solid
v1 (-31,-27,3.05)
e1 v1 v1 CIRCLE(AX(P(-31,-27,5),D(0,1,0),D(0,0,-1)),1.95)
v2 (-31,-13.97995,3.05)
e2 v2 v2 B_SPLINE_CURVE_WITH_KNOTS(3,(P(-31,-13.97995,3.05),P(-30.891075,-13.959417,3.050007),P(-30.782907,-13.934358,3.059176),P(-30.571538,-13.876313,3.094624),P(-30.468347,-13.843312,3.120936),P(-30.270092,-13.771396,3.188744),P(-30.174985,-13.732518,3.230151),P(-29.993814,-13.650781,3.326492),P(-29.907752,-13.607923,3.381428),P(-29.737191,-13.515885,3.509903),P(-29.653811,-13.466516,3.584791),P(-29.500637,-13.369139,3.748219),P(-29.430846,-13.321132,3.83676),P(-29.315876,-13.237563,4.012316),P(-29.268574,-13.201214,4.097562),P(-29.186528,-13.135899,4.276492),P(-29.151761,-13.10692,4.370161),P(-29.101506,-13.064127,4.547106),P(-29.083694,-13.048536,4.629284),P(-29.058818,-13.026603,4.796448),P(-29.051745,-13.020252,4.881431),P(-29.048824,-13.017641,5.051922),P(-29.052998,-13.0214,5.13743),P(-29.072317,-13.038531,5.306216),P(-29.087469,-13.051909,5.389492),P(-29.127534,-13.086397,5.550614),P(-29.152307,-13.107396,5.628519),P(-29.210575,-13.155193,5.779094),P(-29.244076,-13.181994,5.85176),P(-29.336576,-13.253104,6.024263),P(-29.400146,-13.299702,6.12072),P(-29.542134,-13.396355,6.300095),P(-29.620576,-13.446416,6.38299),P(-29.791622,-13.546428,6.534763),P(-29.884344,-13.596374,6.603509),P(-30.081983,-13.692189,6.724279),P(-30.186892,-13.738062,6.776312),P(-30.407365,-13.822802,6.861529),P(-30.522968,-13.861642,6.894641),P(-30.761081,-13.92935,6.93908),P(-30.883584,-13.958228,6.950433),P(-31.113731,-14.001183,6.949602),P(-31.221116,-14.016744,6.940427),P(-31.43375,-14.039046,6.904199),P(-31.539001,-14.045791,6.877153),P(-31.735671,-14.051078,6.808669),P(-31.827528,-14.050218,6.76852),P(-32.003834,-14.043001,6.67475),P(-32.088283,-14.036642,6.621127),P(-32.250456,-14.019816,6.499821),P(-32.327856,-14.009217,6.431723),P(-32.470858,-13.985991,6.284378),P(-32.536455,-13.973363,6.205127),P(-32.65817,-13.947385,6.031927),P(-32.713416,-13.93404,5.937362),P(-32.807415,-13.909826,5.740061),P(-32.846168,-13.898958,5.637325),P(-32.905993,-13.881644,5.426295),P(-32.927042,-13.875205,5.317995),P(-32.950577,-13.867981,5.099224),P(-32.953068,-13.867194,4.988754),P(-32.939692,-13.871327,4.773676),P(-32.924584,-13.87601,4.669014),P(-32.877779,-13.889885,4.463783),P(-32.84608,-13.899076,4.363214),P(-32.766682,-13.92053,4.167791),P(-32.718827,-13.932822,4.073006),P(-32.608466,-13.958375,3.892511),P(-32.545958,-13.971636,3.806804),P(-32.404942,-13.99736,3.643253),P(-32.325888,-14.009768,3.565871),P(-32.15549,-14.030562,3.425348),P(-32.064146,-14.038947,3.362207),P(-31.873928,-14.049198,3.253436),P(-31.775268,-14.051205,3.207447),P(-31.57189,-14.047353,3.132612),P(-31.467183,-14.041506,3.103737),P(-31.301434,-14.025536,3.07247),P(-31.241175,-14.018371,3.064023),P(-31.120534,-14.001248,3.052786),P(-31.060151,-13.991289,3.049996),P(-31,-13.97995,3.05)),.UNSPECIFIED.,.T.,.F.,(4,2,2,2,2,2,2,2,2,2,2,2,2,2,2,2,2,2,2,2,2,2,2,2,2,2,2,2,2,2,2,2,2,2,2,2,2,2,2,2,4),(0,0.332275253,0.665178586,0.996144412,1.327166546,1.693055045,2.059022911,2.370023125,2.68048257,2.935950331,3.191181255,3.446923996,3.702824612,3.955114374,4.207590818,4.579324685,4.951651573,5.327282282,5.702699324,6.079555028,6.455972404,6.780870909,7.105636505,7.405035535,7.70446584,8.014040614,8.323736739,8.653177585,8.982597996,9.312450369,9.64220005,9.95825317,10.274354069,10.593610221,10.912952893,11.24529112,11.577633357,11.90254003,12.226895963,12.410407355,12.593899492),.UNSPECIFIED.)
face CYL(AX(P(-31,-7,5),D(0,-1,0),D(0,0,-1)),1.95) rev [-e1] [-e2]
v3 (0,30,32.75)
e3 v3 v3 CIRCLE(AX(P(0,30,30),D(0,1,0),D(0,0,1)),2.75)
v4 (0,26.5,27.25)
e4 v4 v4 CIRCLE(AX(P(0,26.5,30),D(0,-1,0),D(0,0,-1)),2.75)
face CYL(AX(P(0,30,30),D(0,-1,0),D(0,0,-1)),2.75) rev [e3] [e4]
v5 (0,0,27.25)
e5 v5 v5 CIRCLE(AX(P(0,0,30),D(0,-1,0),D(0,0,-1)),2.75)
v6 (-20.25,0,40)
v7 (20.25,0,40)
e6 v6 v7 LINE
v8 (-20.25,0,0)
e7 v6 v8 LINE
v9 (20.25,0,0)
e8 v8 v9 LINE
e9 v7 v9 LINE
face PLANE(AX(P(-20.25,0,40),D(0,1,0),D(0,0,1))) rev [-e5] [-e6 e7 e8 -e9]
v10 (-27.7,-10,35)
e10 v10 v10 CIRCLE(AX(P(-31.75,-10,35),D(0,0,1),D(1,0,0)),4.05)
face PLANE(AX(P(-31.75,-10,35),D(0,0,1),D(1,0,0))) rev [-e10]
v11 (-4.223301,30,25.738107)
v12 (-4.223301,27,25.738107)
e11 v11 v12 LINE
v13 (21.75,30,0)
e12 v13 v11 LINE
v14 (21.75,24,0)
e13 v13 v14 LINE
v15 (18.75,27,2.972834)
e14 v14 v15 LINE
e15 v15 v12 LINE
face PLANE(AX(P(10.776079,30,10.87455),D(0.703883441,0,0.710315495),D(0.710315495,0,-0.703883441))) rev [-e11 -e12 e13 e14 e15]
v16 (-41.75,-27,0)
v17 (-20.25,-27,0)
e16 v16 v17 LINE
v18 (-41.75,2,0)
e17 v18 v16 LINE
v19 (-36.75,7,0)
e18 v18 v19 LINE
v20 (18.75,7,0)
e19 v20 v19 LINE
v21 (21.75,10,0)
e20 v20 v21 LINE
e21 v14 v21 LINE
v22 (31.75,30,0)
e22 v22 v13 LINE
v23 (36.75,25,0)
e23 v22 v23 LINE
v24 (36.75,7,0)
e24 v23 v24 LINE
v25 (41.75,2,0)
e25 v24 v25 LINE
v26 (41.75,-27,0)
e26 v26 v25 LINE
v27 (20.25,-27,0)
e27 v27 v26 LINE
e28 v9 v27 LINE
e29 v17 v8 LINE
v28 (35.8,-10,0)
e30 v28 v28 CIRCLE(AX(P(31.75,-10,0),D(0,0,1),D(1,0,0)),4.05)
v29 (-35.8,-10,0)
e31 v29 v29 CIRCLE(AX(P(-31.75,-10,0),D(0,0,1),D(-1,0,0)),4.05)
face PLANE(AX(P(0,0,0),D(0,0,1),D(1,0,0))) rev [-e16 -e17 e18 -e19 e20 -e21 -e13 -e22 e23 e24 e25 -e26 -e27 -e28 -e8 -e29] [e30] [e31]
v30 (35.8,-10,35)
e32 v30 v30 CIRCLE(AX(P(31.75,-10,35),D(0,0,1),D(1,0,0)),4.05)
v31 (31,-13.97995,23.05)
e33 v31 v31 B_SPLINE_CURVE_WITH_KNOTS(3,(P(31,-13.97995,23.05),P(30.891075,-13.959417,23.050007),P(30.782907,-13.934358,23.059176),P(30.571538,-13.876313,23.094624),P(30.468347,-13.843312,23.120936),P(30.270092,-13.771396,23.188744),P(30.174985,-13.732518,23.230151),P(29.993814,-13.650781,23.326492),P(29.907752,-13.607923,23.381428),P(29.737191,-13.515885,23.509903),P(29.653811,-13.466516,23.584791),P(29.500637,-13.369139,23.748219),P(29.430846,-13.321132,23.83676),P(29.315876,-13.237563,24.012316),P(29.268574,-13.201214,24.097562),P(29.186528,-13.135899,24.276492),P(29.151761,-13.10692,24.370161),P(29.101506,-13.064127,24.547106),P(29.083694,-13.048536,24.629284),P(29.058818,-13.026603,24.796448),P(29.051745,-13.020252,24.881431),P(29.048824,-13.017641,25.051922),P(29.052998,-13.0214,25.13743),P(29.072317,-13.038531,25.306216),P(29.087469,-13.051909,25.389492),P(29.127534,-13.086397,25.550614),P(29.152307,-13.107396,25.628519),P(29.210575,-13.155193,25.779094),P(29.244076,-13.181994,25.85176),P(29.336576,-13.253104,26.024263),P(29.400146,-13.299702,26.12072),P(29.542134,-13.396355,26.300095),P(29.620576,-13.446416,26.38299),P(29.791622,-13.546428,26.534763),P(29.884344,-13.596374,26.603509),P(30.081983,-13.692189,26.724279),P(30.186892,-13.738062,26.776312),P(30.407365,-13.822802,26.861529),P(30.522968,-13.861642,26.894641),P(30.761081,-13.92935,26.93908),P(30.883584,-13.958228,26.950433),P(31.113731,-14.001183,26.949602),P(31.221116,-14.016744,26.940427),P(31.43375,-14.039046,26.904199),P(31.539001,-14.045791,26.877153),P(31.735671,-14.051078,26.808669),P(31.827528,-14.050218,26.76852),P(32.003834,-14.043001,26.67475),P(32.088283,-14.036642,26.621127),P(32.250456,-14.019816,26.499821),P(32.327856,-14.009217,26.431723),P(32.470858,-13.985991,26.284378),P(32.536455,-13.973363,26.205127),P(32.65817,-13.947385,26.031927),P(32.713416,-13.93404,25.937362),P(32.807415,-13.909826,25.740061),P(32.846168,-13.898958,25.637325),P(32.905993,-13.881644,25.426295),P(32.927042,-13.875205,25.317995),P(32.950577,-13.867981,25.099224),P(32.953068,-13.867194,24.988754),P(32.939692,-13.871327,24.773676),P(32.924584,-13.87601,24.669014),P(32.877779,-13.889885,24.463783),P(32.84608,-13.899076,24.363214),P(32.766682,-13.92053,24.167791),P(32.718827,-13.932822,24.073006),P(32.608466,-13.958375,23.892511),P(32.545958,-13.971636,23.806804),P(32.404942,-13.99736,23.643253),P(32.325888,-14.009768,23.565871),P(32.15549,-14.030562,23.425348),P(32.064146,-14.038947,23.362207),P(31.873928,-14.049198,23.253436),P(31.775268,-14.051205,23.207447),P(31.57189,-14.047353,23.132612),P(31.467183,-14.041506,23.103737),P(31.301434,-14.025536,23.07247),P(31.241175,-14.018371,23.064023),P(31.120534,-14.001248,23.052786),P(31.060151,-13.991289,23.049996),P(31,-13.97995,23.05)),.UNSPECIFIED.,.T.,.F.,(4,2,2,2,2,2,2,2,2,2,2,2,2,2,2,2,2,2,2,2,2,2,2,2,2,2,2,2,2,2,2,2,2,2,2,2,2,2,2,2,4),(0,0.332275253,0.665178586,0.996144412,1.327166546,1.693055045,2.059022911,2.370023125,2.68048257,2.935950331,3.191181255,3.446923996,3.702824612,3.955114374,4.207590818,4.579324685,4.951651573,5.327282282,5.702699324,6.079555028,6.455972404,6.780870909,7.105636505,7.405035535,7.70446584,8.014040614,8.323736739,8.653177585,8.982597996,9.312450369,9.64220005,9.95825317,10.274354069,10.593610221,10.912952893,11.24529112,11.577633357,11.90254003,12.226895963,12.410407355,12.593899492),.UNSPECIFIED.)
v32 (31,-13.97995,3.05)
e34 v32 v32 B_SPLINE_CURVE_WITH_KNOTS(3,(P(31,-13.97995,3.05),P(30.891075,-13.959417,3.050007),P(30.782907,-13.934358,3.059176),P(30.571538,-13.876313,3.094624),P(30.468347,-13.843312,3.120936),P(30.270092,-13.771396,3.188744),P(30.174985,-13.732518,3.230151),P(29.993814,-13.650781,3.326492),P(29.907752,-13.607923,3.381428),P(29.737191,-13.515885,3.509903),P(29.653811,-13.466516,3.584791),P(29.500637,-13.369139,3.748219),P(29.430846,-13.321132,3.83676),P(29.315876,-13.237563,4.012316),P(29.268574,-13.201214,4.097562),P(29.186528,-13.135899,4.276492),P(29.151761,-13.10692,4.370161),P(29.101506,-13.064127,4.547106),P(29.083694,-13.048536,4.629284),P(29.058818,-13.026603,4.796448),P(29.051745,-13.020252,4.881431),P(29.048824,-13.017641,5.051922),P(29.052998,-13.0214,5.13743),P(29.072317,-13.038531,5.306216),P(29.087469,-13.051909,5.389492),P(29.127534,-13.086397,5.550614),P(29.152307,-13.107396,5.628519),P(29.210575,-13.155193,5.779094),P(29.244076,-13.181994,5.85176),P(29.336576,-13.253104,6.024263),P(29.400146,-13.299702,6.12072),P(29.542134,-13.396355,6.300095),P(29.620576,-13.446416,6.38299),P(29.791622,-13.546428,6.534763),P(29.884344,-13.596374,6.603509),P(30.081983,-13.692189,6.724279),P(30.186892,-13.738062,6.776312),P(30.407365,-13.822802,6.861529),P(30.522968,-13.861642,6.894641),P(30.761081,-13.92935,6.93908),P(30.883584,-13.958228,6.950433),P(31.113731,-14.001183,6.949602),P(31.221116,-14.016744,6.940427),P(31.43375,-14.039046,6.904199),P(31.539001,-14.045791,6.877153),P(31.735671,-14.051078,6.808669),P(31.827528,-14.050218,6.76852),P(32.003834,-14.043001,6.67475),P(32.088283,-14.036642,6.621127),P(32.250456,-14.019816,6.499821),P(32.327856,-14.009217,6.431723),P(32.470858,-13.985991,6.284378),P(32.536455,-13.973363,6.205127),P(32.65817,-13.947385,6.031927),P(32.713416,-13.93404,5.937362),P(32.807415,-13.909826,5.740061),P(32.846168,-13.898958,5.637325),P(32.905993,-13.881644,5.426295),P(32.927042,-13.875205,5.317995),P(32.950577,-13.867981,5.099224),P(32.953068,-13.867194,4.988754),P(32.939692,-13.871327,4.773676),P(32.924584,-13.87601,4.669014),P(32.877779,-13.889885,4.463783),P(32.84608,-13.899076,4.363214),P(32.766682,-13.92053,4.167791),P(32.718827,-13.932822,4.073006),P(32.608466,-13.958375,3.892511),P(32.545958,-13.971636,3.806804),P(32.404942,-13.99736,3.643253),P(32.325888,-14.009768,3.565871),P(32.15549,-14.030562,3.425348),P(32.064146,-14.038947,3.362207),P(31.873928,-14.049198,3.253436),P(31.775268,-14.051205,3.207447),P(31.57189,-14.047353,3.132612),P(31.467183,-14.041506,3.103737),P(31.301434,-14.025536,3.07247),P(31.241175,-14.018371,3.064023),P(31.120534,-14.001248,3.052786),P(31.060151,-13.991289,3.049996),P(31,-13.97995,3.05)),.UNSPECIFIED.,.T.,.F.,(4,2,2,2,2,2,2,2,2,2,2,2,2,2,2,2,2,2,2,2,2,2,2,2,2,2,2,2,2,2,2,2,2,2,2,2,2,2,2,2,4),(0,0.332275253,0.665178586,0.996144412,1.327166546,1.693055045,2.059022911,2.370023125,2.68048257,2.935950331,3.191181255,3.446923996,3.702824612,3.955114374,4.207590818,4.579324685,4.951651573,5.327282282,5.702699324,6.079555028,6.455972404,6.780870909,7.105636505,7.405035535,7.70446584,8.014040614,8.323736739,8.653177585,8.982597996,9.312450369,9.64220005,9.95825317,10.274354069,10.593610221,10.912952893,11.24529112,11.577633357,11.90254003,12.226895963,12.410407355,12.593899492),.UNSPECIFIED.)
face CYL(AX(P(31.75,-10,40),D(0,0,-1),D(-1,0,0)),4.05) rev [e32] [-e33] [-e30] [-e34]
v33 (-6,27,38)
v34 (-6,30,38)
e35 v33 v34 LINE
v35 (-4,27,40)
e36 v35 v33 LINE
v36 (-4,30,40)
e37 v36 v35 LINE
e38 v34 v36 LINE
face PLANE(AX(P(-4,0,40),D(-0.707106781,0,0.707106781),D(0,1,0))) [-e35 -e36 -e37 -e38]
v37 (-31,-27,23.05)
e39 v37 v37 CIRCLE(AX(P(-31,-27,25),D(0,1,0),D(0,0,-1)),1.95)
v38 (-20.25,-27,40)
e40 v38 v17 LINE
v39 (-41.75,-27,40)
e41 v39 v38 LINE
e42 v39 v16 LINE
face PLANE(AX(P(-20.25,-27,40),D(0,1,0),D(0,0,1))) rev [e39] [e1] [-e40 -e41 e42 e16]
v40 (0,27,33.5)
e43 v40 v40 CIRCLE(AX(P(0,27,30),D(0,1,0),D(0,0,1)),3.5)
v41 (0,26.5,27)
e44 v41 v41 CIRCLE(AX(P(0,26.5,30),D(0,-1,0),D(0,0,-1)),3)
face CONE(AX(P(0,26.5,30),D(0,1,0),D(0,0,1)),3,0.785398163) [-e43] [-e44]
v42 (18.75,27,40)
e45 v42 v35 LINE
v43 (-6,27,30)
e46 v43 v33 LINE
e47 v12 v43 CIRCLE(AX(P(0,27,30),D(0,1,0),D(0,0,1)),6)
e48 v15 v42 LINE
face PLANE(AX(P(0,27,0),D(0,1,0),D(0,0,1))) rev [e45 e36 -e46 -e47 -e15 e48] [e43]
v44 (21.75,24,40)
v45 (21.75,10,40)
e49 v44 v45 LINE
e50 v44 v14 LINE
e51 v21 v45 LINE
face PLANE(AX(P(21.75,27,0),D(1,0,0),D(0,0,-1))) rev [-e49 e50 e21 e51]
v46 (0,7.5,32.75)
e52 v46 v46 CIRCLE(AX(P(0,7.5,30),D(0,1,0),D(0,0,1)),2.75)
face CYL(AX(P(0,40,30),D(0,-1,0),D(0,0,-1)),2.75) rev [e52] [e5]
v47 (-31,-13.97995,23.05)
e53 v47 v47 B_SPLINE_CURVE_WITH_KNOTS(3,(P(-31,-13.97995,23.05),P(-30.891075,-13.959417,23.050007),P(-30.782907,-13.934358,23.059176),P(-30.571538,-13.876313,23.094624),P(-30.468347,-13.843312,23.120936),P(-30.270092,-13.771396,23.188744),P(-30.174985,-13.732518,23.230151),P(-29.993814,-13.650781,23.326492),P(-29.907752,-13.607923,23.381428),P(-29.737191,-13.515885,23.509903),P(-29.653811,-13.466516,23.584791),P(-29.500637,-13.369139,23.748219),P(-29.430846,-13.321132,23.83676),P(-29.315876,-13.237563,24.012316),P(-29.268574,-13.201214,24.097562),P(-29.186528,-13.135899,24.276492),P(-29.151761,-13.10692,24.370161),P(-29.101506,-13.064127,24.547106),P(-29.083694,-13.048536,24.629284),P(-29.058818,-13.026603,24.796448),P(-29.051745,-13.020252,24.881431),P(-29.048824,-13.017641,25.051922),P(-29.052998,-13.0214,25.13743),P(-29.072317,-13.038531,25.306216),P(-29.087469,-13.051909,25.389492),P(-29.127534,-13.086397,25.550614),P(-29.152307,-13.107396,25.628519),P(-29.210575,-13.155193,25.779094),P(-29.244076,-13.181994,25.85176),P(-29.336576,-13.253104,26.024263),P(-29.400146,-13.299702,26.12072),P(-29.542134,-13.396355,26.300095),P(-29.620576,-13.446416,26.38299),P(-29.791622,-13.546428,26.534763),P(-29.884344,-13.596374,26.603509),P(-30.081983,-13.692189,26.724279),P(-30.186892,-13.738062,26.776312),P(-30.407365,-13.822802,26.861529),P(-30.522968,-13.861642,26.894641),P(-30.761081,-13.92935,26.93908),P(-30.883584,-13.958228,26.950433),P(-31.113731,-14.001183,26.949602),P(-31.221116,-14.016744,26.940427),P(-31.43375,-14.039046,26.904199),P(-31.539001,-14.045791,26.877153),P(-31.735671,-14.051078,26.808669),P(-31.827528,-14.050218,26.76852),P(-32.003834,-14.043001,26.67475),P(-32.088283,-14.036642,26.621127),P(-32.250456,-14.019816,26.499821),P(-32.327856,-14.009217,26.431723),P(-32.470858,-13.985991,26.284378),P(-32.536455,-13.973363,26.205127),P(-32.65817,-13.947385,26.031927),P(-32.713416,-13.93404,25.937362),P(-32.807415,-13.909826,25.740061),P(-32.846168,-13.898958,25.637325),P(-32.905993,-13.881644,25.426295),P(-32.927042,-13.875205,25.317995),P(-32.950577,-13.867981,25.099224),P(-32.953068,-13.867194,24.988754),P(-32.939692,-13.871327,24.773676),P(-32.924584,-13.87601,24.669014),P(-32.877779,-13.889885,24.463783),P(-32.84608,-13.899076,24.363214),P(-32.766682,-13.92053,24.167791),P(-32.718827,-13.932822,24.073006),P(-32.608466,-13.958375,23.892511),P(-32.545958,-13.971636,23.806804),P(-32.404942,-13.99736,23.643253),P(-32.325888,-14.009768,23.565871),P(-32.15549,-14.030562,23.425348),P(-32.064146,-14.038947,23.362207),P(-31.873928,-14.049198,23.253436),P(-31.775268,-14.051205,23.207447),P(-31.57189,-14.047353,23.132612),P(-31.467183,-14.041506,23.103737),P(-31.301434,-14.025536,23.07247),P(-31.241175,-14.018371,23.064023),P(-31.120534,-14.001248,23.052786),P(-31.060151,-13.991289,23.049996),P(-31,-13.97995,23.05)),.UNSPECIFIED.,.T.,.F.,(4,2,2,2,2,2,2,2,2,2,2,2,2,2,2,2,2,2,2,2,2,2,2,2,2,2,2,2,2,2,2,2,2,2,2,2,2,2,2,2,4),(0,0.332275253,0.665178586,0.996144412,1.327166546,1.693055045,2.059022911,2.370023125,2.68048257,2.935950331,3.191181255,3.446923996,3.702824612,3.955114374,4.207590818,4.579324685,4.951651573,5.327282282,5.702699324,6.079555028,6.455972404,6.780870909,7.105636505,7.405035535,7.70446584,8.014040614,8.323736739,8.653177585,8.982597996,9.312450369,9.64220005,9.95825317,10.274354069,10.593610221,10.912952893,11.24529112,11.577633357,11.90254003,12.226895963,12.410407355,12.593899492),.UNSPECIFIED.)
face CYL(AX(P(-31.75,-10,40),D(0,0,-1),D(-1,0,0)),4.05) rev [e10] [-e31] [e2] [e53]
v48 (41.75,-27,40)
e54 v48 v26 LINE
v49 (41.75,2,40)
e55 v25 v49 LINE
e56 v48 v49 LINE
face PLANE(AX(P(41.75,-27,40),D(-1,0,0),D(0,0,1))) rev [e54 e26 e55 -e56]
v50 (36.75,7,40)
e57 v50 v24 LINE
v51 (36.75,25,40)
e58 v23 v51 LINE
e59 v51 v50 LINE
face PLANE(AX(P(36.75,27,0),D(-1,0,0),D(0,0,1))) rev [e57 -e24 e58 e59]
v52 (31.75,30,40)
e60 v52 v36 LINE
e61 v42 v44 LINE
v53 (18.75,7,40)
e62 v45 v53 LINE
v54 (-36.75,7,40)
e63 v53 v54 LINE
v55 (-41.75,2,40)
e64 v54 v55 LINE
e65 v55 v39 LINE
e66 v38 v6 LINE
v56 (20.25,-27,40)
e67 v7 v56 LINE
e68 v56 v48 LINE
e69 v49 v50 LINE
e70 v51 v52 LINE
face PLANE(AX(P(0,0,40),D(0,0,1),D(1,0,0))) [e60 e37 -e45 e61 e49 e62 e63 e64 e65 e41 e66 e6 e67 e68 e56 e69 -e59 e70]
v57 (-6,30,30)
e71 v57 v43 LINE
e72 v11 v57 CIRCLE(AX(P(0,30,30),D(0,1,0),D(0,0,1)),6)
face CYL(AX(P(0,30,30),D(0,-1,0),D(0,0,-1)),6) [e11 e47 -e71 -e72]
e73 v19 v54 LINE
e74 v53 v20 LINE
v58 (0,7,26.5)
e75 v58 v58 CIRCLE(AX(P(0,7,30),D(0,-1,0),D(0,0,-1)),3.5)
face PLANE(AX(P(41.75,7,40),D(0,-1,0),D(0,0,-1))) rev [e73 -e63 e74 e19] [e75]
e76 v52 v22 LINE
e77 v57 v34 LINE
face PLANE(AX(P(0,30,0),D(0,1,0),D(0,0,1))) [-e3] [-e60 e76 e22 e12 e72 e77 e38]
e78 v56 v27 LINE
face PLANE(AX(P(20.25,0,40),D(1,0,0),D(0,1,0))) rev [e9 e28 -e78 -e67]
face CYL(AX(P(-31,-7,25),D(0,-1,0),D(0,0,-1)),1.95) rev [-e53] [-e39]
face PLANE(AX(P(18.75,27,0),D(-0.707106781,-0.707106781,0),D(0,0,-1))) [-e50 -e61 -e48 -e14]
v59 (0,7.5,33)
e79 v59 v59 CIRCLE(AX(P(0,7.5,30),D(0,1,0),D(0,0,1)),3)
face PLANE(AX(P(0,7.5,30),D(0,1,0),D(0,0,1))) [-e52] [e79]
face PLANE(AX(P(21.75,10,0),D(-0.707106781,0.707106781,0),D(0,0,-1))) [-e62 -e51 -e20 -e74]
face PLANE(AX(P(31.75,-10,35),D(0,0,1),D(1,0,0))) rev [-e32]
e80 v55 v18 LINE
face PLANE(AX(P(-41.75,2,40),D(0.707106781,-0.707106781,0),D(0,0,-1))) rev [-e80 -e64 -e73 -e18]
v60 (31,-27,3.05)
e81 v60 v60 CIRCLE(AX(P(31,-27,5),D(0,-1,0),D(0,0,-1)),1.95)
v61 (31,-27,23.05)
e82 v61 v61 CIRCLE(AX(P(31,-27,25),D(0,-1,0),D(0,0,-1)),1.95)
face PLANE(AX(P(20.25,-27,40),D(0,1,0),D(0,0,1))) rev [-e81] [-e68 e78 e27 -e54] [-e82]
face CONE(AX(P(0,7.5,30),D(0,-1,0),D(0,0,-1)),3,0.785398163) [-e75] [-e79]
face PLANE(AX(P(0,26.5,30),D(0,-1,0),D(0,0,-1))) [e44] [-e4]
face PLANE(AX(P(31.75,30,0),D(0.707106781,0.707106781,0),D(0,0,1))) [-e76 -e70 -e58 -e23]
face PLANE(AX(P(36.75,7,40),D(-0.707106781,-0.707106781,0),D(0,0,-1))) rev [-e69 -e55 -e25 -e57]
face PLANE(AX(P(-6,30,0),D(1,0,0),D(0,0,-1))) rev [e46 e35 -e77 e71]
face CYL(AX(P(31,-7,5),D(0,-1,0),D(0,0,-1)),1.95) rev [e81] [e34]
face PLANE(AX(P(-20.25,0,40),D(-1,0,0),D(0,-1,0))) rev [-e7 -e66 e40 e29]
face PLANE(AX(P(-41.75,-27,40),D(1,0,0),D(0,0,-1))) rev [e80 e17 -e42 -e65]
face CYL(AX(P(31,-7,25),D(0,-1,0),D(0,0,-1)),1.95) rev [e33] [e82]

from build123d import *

# Parameters (mm, degrees)
SKETCH1_R           = 4.05
BOSS_EXTRUDE1_DEPTH = 40
SKETCH2_R           = 2.75
CUT_EXTRUDE1_DEPTH  = 40
CHAMFER1_SIZE       = 5
SKETCH4_W           = 15
SKETCH4_H           = 40
BOSS_EXTRUDE2_DEPTH = 20
SKETCH5_R           = 2.75
BOSS_EXTRUDE3_DEPTH = 3
CHAMFER2_SIZE       = 5
CHAMFER3_SIZE       = 5
BOSS_EXTRUDE4_START = -5
SKETCH6_R           = 4.05
BOSS_EXTRUDE4_DEPTH = 5
SKETCH7_R           = 1.95
CUT_EXTRUDE2_DEPTH  = 20
CHAMFER4_SIZE       = 2
CHAMFER5_SIZE       = 3
SKETCH8_R           = 3
SKETCH8_R_2         = 2.75
BOSS_EXTRUDE5_DEPTH = 0.5
CHAMFER6_SIZE       = 0.5
BOSS_EXTRUDE6_START = 0.5
SKETCH9_R           = 3
SKETCH9_R_2         = 2.75
BOSS_EXTRUDE6_DEPTH = 0.5
CHAMFER7_SIZE       = 0.5


with BuildPart() as part:
    # Sketch1 → Boss-Extrude1 (new body)
    with BuildSketch(Plane.XY):
        Polygon((-20.25, 0), (20.25, 0), (20.25, -27), (41.75, -27), (41.75, 7), (-41.75, 7), (-41.75, -27), (-20.25, -27), align=None)
        with Locations((31.75, -10)):
            Circle(SKETCH1_R, mode=Mode.SUBTRACT)
        with Locations(Location((-31.75, -10, 0), (0, 0, 180))):
            Circle(SKETCH1_R, mode=Mode.SUBTRACT)
    extrude(amount=BOSS_EXTRUDE1_DEPTH)

    # Sketch2 → Cut-Extrude1 (cut)
    with BuildSketch(Plane(origin=(0, 0, 0), x_dir=(-1, 0, 0), z_dir=(0, -1, 0))):
        with Locations(Location((0, -30, 0), (0, 0, 90))):
            Circle(SKETCH2_R)
    extrude(amount=-CUT_EXTRUDE1_DEPTH, mode=Mode.SUBTRACT)

    # Chamfer1
    chamfer1_edges = [part.edges().sort_by_distance(p)[0] for p in [
        (41.75, 7, 20),
    ]]
    chamfer(chamfer1_edges, length=CHAMFER1_SIZE)

    # Sketch4 → Boss-Extrude2 (add)
    with BuildSketch(Plane(origin=(0, 7, 0), x_dir=(1, 0, 0), z_dir=(0, 1, 0))):
        with Locations((29.25, -20)):
            Rectangle(SKETCH4_W, SKETCH4_H)
    extrude(amount=BOSS_EXTRUDE2_DEPTH)

    # Sketch5 → Boss-Extrude3 (add)
    with BuildSketch(Plane(origin=(0, 27, 0), x_dir=(1, 0, 0), z_dir=(0, 1, 0))):
        with BuildLine():
            Line((20.579588566, -40), (21.75, -40))
            Line((21.75, -40), (36.75, -40))
            Line((36.75, -40), (36.75, 0))
            Line((36.75, 0), (21.75, 0))
            Line((21.75, 0), (-4.223300645, -25.738107033))
            ThreePointArc((-4.223300645, -25.738107033), (-5.538041345, -27.691299485), (-6, -30))
            Line((-6, -30), (-6, -40))
            Line((-6, -40), (20.579588566, -40))
        make_face()
        with Locations(Location((0, -30, 0), (0, 0, 90))):
            Circle(SKETCH5_R, mode=Mode.SUBTRACT)
    extrude(amount=BOSS_EXTRUDE3_DEPTH)

    # Chamfer2
    chamfer2_edges = [part.edges().sort_by_distance(p)[0] for p in [
        (36.75, 30, 20),
    ]]
    chamfer(chamfer2_edges, length=CHAMFER2_SIZE)

    # Chamfer3
    chamfer3_edges = [part.edges().sort_by_distance(p)[0] for p in [
        (-41.75, 7, 20),
    ]]
    chamfer(chamfer3_edges, length=CHAMFER3_SIZE)

    # Sketch6 → Boss-Extrude4 (add)
    with BuildSketch(Plane.XY.offset(40).offset(BOSS_EXTRUDE4_START)):
        with Locations(Location((-31.75, -10, 0), (0, 0, 180))):
            Circle(SKETCH6_R)
        with Locations((31.75, -10)):
            Circle(SKETCH6_R)
    extrude(amount=BOSS_EXTRUDE4_DEPTH)

    # Sketch7 → Cut-Extrude2 (cut)
    with BuildSketch(Plane(origin=(0, -27, 0), x_dir=(-1, 0, 0), z_dir=(0, -1, 0))):
        with Locations(Location((-31, -5, 0), (0, 0, 90))):
            Circle(SKETCH7_R)
        with Locations(Location((-31, -25, 0), (0, 0, 90))):
            Circle(SKETCH7_R)
    cut_extrude2 = extrude(amount=-CUT_EXTRUDE2_DEPTH, mode=Mode.SUBTRACT)

    # Mirror1: Cut-Extrude2 across plane
    add(cut_extrude2.mirror(Plane(origin=(0, 0, 0), x_dir=(0, 0, 1), z_dir=(1, 0, 0))), mode=Mode.SUBTRACT)

    # Chamfer4
    chamfer4_edges = [part.edges().sort_by_distance(p)[0] for p in [
        (-6, 28.5, 40),
    ]]
    chamfer(chamfer4_edges, length=CHAMFER4_SIZE)

    # Chamfer5
    chamfer5_edges = [part.edges().sort_by_distance(p)[0] for p in [
        (21.75, 7, 20),
        (21.75, 27, 20),
    ]]
    chamfer(chamfer5_edges, length=CHAMFER5_SIZE)

    # Sketch8 → Boss-Extrude5 (add)
    with BuildSketch(Plane(origin=(0, 7, 0), x_dir=(1, 0, 0), z_dir=(0, 1, 0))):
        with Locations(Location((0, -30, 0), (0, 0, 90))):
            Circle(SKETCH8_R)
        with Locations(Location((0, -30, 0), (0, 0, 90))):
            Circle(SKETCH8_R_2, mode=Mode.SUBTRACT)
    extrude(amount=BOSS_EXTRUDE5_DEPTH)

    # Chamfer6
    chamfer6_edges = [part.edges().sort_by_distance(p)[0] for p in [
        (0, 7, 33),
    ]]
    chamfer(chamfer6_edges, length=CHAMFER6_SIZE - 0.0001)  # a hair under: the kernel refuses the full size

    # Sketch9 → Boss-Extrude6 (add)
    with BuildSketch(Plane(origin=(0, 27, 0), x_dir=(-1, 0, 0), z_dir=(0, -1, 0)).offset(BOSS_EXTRUDE6_START)):
        with Locations(Location((0, -30, 0), (0, 0, 270))):
            Circle(SKETCH9_R)
        with Locations(Location((0, -30, 0), (0, 0, 90))):
            Circle(SKETCH9_R_2, mode=Mode.SUBTRACT)
    extrude(amount=-BOSS_EXTRUDE6_DEPTH)

    # Chamfer7
    chamfer7_edges = [part.edges().sort_by_distance(p)[0] for p in [
        (0, 27, 27),
    ]]
    chamfer(chamfer7_edges, length=CHAMFER7_SIZE - 0.0001)  # a hair under: the kernel refuses the full size


solid = part.part
